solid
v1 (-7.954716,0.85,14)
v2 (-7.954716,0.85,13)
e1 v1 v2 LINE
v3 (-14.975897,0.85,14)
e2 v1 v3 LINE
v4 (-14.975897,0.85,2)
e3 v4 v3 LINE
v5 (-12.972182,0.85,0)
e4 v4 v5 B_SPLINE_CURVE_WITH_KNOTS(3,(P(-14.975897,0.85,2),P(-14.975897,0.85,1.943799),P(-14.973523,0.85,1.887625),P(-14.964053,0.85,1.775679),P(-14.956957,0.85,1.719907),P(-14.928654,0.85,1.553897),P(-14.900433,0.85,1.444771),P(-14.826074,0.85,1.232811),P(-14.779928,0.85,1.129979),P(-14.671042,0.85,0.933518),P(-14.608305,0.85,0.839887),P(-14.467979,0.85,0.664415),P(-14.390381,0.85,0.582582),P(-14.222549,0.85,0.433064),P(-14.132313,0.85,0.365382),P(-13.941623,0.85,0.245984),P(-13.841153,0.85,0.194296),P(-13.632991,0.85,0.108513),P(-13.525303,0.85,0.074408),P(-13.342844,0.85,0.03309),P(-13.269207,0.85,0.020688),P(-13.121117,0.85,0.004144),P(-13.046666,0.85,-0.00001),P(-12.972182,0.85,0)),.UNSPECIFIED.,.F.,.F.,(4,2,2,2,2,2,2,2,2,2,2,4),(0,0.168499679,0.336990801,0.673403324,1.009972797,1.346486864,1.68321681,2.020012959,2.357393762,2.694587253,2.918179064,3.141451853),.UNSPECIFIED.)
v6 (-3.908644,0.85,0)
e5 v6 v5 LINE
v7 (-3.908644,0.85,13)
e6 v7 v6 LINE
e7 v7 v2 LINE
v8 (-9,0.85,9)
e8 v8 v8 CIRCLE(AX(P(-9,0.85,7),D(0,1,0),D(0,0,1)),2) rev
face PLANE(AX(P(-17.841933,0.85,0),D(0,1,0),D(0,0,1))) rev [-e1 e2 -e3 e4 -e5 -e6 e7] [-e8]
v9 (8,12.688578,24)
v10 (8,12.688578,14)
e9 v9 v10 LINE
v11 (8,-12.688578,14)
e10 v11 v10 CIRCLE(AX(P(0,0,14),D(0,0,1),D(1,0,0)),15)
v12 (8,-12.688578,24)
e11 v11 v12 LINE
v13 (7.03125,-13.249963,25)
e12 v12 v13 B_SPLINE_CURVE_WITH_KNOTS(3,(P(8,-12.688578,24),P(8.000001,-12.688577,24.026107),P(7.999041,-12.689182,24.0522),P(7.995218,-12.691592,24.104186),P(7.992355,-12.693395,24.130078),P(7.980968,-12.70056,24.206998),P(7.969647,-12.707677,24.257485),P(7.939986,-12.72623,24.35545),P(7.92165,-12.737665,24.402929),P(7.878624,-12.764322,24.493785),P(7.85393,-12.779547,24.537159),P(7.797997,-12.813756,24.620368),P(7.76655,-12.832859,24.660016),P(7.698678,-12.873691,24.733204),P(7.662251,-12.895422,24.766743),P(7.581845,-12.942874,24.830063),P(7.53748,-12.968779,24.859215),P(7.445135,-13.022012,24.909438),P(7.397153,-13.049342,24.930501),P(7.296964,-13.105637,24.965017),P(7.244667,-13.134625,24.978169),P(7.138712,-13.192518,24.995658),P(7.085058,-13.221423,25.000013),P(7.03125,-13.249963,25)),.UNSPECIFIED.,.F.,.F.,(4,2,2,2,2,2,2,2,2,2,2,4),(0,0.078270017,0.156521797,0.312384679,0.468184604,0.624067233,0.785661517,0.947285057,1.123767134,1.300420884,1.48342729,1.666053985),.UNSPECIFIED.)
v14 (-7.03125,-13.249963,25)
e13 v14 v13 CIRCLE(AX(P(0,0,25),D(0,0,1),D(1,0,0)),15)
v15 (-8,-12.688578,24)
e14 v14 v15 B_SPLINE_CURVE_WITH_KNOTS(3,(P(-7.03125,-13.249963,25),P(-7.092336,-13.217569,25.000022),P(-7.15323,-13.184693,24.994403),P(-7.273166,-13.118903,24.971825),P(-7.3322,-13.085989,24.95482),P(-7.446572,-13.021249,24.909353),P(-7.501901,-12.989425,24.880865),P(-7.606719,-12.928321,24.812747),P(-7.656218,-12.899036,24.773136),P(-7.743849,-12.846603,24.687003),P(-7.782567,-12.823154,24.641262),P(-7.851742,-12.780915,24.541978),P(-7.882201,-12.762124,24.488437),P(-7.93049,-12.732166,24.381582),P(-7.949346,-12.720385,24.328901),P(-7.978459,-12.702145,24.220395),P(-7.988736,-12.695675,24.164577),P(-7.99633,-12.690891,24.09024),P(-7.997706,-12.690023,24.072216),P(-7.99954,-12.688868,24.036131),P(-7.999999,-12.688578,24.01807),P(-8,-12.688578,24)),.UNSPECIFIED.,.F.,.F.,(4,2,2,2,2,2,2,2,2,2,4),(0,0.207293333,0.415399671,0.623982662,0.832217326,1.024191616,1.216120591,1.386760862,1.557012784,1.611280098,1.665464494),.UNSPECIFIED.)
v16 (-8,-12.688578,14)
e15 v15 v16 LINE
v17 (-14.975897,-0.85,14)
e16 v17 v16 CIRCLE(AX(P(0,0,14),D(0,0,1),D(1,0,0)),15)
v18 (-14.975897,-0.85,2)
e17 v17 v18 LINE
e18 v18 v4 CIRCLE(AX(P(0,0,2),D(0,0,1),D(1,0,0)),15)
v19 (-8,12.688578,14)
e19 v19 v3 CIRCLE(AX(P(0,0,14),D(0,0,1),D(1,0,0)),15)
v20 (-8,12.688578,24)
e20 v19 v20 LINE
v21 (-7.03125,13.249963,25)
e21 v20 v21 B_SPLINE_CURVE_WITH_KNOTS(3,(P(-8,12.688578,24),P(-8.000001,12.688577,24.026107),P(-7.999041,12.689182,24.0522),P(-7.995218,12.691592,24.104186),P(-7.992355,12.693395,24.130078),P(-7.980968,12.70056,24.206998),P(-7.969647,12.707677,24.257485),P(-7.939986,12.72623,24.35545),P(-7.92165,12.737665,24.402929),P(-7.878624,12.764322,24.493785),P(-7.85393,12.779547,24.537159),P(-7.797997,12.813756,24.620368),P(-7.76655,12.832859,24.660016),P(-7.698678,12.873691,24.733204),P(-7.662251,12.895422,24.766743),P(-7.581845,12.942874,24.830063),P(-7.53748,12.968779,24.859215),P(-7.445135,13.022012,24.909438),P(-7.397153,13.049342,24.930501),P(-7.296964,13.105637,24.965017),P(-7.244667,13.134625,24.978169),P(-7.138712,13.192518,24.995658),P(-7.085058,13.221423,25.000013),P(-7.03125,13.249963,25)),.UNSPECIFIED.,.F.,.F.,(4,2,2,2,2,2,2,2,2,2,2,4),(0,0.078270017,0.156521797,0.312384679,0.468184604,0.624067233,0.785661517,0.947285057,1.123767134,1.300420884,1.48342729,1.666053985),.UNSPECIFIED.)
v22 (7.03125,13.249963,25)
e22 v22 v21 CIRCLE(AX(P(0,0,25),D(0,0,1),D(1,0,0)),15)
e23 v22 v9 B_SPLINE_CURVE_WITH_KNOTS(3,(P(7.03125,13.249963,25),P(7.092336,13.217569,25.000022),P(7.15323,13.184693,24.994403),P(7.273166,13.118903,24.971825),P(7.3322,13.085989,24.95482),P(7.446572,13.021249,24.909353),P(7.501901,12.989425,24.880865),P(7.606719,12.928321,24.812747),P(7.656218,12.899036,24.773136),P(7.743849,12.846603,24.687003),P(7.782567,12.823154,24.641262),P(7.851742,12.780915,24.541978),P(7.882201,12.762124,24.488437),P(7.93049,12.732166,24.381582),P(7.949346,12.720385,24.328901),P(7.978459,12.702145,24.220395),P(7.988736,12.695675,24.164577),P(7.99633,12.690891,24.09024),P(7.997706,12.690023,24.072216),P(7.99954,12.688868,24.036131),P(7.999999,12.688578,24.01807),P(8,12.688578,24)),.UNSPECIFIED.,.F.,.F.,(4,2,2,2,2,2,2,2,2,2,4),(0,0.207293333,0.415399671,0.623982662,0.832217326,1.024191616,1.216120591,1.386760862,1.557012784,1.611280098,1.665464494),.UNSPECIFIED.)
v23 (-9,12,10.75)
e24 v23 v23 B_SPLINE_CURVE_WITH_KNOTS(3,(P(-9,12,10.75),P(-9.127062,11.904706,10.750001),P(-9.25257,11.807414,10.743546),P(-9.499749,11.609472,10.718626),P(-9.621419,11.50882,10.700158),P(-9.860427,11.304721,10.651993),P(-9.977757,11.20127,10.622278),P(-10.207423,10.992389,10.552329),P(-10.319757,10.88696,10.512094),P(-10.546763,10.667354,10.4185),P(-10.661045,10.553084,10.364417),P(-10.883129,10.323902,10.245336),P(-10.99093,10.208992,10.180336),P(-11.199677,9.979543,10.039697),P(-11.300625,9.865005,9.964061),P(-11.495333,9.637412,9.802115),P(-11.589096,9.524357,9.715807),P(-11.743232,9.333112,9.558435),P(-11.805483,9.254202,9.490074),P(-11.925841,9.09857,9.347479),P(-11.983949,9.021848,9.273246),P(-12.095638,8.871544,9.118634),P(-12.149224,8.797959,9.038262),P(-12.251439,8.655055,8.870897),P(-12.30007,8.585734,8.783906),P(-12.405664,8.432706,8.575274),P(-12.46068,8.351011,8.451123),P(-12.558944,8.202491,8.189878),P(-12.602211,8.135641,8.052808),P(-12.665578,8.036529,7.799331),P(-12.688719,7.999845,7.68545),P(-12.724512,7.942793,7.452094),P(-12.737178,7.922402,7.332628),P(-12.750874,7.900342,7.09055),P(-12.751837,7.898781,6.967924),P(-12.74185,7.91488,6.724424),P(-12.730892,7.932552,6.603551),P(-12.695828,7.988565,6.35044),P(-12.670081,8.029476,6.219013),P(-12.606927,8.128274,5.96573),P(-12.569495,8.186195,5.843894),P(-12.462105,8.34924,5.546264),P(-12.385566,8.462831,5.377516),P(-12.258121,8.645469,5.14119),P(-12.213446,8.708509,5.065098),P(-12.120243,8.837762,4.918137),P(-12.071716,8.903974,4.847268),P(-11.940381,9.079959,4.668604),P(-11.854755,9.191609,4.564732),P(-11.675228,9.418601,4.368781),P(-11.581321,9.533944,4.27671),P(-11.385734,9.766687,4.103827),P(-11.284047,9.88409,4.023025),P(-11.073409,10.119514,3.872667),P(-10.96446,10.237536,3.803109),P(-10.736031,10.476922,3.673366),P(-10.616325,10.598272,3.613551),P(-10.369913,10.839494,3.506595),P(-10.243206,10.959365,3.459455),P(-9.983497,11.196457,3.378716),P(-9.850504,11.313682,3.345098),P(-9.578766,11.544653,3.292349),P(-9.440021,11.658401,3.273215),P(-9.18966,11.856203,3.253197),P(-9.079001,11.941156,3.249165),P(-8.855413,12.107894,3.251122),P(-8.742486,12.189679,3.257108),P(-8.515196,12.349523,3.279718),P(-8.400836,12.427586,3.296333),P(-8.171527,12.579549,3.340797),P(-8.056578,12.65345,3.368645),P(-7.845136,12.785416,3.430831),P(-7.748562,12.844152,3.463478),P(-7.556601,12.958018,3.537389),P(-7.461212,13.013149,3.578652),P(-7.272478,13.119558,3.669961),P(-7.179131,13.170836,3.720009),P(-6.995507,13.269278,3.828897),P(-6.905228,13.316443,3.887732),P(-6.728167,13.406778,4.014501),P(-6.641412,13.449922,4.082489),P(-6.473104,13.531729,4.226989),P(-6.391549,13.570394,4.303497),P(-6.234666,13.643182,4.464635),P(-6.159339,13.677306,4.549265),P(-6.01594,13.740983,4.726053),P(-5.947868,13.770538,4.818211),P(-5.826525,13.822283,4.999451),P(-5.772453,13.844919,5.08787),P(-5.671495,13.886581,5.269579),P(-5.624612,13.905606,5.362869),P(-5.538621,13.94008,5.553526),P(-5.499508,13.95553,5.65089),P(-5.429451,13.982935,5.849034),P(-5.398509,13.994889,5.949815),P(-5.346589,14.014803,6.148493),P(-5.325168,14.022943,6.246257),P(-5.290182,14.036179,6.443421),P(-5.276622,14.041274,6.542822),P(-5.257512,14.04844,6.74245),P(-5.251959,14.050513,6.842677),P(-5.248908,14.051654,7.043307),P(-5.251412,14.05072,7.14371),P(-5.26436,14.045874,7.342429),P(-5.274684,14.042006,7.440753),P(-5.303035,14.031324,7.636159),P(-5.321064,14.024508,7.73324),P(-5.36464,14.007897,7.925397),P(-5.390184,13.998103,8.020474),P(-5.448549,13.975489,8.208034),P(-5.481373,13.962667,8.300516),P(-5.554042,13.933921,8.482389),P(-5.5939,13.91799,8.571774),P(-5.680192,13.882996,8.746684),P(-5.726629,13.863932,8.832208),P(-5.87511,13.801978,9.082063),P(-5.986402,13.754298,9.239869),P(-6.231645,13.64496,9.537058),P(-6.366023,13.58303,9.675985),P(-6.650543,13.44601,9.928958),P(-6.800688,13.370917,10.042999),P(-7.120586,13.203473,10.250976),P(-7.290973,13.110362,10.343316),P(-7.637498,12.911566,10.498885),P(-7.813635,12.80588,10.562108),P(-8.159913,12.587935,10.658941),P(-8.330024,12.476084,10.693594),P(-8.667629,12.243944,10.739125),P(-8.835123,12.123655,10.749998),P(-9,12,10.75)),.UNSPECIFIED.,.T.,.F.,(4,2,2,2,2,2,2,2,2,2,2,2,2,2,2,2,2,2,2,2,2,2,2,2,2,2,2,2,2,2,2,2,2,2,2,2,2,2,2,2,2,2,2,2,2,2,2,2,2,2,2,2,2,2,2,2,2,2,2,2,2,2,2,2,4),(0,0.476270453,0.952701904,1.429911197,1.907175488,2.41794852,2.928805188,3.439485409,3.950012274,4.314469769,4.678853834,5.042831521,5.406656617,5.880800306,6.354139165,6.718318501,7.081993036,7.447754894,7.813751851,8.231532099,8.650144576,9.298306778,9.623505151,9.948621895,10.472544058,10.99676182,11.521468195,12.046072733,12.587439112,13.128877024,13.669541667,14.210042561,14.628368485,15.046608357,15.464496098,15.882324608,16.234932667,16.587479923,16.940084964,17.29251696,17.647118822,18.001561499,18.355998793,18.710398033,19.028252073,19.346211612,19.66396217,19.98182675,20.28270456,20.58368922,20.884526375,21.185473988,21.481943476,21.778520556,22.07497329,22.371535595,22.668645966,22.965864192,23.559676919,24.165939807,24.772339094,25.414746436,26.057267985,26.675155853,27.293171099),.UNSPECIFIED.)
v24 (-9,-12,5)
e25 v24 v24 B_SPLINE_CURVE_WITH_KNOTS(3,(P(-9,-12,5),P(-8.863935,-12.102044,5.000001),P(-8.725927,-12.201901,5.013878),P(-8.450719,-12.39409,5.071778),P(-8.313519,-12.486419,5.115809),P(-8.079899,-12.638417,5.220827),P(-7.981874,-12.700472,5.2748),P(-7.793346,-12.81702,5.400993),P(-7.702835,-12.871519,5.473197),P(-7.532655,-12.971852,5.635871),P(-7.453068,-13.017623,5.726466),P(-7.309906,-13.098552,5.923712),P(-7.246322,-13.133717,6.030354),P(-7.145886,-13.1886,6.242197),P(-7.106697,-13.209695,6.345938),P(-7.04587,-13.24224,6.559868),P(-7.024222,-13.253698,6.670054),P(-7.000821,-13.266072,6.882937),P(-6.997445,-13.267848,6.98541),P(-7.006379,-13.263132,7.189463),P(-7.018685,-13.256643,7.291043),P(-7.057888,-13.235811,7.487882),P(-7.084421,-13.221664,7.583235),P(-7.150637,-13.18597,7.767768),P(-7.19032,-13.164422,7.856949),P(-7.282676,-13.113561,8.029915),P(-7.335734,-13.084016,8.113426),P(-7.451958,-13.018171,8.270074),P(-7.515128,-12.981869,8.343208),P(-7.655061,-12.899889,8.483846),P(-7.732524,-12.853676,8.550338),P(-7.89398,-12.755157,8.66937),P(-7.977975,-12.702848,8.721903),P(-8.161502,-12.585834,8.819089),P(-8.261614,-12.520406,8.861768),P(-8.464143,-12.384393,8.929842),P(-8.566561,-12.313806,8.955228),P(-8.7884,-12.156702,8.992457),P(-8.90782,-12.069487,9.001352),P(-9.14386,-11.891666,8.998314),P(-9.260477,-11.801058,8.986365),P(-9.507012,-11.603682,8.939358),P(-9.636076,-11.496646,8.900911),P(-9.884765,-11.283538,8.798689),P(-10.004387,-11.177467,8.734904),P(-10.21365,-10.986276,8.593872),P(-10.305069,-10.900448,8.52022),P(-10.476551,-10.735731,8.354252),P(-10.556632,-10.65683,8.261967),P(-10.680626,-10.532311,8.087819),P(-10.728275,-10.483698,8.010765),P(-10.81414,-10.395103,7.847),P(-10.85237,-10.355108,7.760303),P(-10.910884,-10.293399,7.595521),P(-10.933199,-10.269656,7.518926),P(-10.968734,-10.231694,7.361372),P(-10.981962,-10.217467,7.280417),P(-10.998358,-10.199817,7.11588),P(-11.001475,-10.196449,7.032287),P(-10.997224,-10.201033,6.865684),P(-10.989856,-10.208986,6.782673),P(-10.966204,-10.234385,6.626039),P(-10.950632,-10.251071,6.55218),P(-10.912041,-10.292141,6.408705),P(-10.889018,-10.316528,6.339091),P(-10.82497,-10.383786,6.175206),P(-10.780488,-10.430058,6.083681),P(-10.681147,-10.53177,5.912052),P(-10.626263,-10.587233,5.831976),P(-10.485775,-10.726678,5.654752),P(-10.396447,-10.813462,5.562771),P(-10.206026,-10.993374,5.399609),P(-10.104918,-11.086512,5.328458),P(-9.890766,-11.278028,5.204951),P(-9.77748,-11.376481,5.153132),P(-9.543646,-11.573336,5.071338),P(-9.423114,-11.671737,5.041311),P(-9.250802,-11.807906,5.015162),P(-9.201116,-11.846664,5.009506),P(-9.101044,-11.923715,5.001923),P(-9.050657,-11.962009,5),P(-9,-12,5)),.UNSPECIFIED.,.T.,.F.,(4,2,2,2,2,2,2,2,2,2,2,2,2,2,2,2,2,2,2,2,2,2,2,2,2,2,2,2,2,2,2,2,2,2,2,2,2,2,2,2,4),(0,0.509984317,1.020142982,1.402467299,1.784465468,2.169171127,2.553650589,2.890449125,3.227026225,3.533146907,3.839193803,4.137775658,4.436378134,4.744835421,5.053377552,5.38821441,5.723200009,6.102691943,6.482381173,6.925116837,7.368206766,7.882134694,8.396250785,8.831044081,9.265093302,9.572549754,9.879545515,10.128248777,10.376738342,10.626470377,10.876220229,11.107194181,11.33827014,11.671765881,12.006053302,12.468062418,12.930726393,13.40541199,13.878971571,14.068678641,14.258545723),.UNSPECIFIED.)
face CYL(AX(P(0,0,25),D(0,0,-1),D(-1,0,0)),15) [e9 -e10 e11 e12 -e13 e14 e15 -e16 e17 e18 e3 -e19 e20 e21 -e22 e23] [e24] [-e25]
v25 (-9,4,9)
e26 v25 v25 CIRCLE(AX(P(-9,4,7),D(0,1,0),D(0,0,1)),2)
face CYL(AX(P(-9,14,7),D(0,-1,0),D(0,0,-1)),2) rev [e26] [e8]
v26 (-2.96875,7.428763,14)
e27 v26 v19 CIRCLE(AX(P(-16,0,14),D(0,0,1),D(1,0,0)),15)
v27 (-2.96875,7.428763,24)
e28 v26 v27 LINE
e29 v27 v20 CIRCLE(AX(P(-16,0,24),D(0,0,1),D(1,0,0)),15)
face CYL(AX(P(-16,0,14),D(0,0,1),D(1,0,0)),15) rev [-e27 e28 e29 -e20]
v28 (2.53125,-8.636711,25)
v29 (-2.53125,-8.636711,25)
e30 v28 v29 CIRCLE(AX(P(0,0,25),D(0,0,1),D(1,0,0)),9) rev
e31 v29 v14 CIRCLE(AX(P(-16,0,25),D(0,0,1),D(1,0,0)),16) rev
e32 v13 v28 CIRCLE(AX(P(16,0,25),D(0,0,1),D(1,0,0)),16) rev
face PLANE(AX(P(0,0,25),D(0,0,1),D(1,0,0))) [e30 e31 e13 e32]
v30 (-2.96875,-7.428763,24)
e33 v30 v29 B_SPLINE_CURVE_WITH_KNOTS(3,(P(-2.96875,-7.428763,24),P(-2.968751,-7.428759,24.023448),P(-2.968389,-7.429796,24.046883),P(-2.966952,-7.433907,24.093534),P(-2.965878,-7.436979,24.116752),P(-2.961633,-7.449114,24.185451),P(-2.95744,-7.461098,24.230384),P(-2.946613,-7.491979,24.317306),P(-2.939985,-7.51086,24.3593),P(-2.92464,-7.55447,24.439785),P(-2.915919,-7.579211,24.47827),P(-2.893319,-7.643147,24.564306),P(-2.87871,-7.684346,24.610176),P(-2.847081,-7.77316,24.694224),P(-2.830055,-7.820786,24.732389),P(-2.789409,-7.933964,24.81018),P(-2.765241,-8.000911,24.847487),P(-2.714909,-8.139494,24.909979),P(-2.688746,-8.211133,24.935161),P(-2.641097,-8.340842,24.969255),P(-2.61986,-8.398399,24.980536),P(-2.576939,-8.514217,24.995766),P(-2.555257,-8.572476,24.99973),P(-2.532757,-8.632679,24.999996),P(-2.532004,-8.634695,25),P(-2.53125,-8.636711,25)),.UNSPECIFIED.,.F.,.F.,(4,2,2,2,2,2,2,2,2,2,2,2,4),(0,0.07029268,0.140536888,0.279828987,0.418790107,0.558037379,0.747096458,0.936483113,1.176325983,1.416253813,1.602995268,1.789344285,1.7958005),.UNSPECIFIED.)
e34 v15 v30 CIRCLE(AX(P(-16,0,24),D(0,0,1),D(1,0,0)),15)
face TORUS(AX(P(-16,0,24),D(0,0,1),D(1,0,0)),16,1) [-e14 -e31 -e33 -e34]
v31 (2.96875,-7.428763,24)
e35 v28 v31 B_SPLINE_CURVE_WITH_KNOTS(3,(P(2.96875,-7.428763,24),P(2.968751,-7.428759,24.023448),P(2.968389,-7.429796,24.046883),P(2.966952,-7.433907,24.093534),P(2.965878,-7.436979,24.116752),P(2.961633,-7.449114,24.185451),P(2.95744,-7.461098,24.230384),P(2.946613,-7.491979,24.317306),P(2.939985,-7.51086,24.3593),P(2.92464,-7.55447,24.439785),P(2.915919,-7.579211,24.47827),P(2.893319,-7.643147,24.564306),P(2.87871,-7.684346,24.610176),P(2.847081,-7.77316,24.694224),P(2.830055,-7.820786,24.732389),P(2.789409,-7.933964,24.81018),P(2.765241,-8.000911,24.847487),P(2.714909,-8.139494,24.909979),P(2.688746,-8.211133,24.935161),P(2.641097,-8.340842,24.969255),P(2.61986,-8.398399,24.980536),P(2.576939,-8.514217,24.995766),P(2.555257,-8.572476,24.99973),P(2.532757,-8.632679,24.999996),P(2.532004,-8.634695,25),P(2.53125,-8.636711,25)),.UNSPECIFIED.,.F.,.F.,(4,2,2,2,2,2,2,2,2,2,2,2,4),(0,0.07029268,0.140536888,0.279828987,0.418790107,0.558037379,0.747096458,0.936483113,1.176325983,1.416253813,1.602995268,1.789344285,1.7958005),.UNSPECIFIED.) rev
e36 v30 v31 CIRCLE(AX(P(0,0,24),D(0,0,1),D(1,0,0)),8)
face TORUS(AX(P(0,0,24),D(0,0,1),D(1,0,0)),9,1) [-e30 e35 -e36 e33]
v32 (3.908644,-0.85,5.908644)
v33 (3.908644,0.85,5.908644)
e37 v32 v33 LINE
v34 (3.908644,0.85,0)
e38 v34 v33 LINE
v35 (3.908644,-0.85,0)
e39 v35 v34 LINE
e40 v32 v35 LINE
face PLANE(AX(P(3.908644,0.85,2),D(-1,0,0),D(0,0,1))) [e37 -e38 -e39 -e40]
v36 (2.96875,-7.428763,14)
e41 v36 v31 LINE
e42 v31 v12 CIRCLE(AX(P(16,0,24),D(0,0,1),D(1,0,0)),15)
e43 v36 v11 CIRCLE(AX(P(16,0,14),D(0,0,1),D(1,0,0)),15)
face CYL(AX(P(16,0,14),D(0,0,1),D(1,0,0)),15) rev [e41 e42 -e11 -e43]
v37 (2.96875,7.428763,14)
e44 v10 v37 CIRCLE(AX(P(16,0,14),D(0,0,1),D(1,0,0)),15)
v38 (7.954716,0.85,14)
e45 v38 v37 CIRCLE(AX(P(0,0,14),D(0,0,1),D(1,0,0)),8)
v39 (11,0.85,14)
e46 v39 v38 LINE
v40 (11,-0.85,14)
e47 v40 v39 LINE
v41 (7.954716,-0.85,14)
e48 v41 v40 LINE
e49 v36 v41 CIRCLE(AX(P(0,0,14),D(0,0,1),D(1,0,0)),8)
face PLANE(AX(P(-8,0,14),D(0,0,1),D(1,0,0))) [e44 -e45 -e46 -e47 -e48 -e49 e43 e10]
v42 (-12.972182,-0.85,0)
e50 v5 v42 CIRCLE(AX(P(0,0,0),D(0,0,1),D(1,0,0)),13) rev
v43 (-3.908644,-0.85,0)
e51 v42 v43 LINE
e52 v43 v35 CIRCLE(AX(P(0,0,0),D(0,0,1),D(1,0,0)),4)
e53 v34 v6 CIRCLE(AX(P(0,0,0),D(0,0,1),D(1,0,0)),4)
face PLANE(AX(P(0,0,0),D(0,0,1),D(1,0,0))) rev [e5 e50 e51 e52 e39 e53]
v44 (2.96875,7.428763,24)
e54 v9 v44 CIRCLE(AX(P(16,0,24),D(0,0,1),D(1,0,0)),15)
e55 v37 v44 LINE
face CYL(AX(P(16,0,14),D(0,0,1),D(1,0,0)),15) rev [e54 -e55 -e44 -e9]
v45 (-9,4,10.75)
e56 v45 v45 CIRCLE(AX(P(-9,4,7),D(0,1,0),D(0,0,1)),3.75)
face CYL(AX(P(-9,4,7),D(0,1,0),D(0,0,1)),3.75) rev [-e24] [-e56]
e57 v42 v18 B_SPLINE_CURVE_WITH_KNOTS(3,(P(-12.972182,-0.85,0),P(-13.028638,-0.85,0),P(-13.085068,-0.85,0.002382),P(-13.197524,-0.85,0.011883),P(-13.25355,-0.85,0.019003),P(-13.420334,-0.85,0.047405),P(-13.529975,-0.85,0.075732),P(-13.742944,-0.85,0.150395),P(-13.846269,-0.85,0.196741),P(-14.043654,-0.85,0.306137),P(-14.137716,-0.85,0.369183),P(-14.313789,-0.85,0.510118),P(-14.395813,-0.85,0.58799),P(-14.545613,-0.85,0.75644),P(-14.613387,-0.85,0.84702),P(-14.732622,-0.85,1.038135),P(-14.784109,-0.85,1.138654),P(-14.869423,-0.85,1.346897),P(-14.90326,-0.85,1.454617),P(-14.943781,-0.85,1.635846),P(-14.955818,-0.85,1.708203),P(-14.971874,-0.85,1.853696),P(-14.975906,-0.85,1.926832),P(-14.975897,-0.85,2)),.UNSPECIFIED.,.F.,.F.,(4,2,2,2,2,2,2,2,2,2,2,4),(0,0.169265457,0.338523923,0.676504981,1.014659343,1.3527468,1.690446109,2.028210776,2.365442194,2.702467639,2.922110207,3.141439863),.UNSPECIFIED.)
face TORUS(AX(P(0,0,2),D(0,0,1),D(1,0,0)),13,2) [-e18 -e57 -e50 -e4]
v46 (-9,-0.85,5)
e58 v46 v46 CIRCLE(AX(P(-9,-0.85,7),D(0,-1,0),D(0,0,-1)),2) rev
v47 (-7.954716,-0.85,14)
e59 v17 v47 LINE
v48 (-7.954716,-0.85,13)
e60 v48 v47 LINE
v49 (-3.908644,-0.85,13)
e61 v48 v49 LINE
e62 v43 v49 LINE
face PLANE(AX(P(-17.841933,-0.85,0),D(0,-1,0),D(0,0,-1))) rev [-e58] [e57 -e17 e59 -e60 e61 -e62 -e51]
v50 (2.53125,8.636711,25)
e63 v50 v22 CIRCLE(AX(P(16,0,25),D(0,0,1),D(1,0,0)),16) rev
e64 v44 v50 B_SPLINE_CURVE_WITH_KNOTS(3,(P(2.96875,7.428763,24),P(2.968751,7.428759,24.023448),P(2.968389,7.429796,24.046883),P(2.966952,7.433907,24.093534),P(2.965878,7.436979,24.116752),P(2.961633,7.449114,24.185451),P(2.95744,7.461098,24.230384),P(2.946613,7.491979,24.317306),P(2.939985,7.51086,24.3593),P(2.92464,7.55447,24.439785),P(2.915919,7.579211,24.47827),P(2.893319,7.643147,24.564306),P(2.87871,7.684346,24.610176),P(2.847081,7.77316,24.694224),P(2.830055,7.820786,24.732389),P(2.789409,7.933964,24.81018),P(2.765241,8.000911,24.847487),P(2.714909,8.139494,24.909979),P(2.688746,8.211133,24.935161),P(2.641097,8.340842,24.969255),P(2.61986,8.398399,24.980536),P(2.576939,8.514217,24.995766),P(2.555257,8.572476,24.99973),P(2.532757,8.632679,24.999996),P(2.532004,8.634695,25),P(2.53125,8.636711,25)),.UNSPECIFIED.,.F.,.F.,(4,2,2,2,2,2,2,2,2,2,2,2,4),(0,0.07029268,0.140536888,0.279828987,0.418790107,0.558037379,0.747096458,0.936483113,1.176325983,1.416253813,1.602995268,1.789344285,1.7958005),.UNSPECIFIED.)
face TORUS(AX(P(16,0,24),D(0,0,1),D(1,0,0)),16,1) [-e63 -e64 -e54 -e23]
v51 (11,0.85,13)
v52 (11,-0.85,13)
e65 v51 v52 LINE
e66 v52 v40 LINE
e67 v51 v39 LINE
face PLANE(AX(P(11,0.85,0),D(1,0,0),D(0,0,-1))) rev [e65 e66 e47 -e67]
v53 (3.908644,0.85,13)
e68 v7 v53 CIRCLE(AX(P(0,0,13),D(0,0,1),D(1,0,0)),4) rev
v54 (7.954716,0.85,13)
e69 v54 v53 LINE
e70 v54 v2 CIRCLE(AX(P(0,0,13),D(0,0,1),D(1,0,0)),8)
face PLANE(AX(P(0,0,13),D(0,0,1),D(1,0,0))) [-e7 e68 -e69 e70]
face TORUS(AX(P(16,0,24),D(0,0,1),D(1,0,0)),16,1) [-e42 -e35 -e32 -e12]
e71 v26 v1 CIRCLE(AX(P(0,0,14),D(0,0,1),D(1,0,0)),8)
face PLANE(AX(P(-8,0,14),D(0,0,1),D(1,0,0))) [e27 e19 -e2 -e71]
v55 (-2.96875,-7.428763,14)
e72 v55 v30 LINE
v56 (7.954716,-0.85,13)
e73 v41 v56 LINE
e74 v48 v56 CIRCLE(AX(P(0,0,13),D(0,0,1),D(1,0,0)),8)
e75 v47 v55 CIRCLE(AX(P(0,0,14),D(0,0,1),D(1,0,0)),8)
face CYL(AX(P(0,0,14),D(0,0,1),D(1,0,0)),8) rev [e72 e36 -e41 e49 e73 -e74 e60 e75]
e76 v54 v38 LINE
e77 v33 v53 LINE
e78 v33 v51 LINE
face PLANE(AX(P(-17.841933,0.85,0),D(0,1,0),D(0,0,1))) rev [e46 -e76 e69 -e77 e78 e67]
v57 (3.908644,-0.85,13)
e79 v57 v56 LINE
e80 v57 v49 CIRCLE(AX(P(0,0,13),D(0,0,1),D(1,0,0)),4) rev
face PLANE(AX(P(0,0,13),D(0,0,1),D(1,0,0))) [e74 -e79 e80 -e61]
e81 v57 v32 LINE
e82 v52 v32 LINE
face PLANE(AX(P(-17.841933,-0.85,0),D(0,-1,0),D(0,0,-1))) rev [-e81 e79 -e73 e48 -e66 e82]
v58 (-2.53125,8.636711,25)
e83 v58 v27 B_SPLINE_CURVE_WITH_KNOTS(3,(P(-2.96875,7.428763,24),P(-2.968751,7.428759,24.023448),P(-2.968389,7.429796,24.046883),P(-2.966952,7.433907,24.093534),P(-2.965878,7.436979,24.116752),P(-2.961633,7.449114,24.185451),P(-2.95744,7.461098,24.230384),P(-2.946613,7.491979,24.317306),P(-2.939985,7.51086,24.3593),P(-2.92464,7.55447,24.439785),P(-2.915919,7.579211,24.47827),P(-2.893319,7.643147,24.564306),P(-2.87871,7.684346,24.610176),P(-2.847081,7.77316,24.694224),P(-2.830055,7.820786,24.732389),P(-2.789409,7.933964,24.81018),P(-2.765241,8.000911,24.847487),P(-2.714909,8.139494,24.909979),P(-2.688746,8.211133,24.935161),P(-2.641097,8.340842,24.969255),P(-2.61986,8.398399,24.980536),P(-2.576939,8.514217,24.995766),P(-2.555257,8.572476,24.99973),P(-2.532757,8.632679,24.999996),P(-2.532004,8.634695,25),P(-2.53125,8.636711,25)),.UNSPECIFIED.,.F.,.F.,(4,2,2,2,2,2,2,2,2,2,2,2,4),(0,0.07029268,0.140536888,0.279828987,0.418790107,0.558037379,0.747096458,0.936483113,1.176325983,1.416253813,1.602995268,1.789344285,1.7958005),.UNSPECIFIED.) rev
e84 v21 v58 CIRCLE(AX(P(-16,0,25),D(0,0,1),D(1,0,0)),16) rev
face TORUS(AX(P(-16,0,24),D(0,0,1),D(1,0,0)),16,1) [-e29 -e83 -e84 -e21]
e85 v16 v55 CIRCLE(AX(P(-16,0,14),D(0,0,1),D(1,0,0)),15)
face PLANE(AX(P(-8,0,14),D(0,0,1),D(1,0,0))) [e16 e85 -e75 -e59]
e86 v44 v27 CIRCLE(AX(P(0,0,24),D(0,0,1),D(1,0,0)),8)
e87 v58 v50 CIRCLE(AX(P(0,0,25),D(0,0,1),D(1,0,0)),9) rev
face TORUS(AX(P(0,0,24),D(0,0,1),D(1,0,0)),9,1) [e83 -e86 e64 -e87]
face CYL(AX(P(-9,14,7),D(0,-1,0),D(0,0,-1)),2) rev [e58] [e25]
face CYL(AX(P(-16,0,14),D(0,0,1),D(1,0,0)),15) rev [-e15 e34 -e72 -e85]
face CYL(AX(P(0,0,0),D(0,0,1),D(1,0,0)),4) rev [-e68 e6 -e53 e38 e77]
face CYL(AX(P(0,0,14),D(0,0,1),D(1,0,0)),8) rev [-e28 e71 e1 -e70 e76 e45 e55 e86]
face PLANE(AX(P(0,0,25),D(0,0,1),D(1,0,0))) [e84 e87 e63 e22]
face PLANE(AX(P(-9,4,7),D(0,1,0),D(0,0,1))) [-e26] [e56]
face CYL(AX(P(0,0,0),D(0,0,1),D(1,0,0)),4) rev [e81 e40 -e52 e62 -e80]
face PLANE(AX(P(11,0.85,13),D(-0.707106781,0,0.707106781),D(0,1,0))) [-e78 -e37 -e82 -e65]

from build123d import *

# Parameters (mm, degrees)
SKETCH1_R               = 15
BOSS_EXTRUDE1_DEPTH     = 25
CUT_EXTRUDE1_DEPTH      = 11
SKETCH4_R               = 4
CUT_EXTRUDE2_DEPTH      = 14
SKETCH5_R               = 8
CUT_EXTRUDE3_DEPTH      = 1
SKETCH6_W               = 28.841933153
SKETCH6_H               = 1.7
CUT_EXTRUDE4_DEPTH      = 14
SKETCH7_W               = 7.091355734
SKETCH7_H               = 1.7
BOSS_EXTRUDE2_DEPTH     = 2
CHAMFER1_SIZE           = 11
CUT_EXTRUDE5_DEPTH      = 14
CUT_EXTRUDE5_DEPTH_BACK = 14
SKETCH8_R               = 2
SKETCH9_R               = 3.75
CUT_EXTRUDE6_DEPTH      = 11
FILLET1_R               = 2
FILLET2_R               = 1


with BuildPart() as part:
    # Sketch1 → Boss-Extrude1 (new body)
    with BuildSketch(Plane.XY):
        Circle(SKETCH1_R)
    extrude(amount=BOSS_EXTRUDE1_DEPTH)

    # Sketch3 → Cut-Extrude1 (cut)
    with BuildSketch(Plane.XY.offset(25)):
        with BuildLine():
            ThreePointArc((2.96875, -7.428763251), (31, 0), (2.96875, 7.428763251))
            ThreePointArc((2.96875, 7.428763251), (0, 8), (-2.96875, 7.428763251))
            ThreePointArc((-2.96875, 7.428763251), (-31, 0), (-2.96875, -7.428763251))
            ThreePointArc((-2.96875, -7.428763251), (0, -8), (2.96875, -7.428763251))
        make_face()
    extrude(amount=-CUT_EXTRUDE1_DEPTH, mode=Mode.SUBTRACT)

    # Sketch4 → Cut-Extrude2 (cut)
    with BuildSketch(Plane.XY.offset(14)):
        Circle(SKETCH4_R)
    extrude(amount=-CUT_EXTRUDE2_DEPTH, mode=Mode.SUBTRACT)

    # Sketch5 → Cut-Extrude3 (cut)
    with BuildSketch(Plane.XY.offset(14)):
        Circle(SKETCH5_R)
    extrude(amount=-CUT_EXTRUDE3_DEPTH, mode=Mode.SUBTRACT)

    # Sketch6 → Cut-Extrude4 (cut)
    with BuildSketch(Plane.XY.offset(14)):
        with Locations((-3.420966576, 0)):
            Rectangle(SKETCH6_W, SKETCH6_H)
    extrude(amount=-CUT_EXTRUDE4_DEPTH, mode=Mode.SUBTRACT)

    # Sketch7 → Boss-Extrude2 (add)
    with BuildSketch(Plane(origin=(0, 0, 0), x_dir=(-1, 0, 0), z_dir=(0, 0, -1))):
        with Locations((-7.454322133, 0)):
            Rectangle(SKETCH7_W, SKETCH7_H)
    extrude(amount=-BOSS_EXTRUDE2_DEPTH)

    # Chamfer1
    # the kernel refuses this chamfer: 11 mm, written as the material it adds along each edge
    with BuildSketch(Plane(origin=(11, -0.85, 2), x_dir=(0.027495876610586414, 0, 0.9996219169112968), z_dir=(0, 1, 0))) as chamfer1_piece_1_section:
        Polygon((CHAMFER1_SIZE * 0.999621916911, -CHAMFER1_SIZE * 0.0274958766106), (-CHAMFER1_SIZE * 0.0274958766106, -CHAMFER1_SIZE * 0.999621916911), (0, 0), align=None)
    chamfer1_piece_1 = extrude(amount=1.7, mode=Mode.PRIVATE)
    chamfer1_piece_1 = split(chamfer1_piece_1, bisect_by=Plane(origin=(3.908644266, 0, 6.042844173), z_dir=(1, 0, 0)), keep=Keep.TOP, mode=Mode.PRIVATE)
    add(chamfer1_piece_1)

    # Sketch8 → Cut-Extrude5 (cut, two sides: drawn at the far end of the back side and taken through both)
    with BuildSketch(Plane(origin=(0, 0, 0), x_dir=(1, 0, 0), z_dir=(0, 1, 0)).offset(-CUT_EXTRUDE5_DEPTH_BACK)):
        with Locations(Location((-9, -7, 0), (0, 0, 90))):
            Circle(SKETCH8_R)
    extrude(amount=CUT_EXTRUDE5_DEPTH + CUT_EXTRUDE5_DEPTH_BACK, mode=Mode.SUBTRACT)

    # Sketch9 → Cut-Extrude6 (cut)
    with BuildSketch(Plane(origin=(0, 15, 0), x_dir=(1, 0, 0), z_dir=(0, 1, 0))):
        with Locations(Location((-9, -7, 0), (0, 0, 270))):
            Circle(SKETCH9_R)
    extrude(amount=-CUT_EXTRUDE6_DEPTH, mode=Mode.SUBTRACT)

    # Fillet1
    fillet1_edges = [part.edges().sort_by_distance(p)[0] for p in [
        (15, 0, 0),
    ]]
    fillet(fillet1_edges, radius=FILLET1_R)

    # Fillet2
    fillet2_edges = [part.edges().sort_by_distance(p)[0] for p in [
        (-5.160499055, 10.368472369, 25),
        (0, -8, 25),
        (5.160499055, -10.368472369, 25),
        (0, 8, 25),
        (-5.160499055, -10.368472369, 25),
        (5.160499055, 10.368472369, 25),
    ]]
    fillet(fillet2_edges, radius=FILLET2_R)


solid = part.part
